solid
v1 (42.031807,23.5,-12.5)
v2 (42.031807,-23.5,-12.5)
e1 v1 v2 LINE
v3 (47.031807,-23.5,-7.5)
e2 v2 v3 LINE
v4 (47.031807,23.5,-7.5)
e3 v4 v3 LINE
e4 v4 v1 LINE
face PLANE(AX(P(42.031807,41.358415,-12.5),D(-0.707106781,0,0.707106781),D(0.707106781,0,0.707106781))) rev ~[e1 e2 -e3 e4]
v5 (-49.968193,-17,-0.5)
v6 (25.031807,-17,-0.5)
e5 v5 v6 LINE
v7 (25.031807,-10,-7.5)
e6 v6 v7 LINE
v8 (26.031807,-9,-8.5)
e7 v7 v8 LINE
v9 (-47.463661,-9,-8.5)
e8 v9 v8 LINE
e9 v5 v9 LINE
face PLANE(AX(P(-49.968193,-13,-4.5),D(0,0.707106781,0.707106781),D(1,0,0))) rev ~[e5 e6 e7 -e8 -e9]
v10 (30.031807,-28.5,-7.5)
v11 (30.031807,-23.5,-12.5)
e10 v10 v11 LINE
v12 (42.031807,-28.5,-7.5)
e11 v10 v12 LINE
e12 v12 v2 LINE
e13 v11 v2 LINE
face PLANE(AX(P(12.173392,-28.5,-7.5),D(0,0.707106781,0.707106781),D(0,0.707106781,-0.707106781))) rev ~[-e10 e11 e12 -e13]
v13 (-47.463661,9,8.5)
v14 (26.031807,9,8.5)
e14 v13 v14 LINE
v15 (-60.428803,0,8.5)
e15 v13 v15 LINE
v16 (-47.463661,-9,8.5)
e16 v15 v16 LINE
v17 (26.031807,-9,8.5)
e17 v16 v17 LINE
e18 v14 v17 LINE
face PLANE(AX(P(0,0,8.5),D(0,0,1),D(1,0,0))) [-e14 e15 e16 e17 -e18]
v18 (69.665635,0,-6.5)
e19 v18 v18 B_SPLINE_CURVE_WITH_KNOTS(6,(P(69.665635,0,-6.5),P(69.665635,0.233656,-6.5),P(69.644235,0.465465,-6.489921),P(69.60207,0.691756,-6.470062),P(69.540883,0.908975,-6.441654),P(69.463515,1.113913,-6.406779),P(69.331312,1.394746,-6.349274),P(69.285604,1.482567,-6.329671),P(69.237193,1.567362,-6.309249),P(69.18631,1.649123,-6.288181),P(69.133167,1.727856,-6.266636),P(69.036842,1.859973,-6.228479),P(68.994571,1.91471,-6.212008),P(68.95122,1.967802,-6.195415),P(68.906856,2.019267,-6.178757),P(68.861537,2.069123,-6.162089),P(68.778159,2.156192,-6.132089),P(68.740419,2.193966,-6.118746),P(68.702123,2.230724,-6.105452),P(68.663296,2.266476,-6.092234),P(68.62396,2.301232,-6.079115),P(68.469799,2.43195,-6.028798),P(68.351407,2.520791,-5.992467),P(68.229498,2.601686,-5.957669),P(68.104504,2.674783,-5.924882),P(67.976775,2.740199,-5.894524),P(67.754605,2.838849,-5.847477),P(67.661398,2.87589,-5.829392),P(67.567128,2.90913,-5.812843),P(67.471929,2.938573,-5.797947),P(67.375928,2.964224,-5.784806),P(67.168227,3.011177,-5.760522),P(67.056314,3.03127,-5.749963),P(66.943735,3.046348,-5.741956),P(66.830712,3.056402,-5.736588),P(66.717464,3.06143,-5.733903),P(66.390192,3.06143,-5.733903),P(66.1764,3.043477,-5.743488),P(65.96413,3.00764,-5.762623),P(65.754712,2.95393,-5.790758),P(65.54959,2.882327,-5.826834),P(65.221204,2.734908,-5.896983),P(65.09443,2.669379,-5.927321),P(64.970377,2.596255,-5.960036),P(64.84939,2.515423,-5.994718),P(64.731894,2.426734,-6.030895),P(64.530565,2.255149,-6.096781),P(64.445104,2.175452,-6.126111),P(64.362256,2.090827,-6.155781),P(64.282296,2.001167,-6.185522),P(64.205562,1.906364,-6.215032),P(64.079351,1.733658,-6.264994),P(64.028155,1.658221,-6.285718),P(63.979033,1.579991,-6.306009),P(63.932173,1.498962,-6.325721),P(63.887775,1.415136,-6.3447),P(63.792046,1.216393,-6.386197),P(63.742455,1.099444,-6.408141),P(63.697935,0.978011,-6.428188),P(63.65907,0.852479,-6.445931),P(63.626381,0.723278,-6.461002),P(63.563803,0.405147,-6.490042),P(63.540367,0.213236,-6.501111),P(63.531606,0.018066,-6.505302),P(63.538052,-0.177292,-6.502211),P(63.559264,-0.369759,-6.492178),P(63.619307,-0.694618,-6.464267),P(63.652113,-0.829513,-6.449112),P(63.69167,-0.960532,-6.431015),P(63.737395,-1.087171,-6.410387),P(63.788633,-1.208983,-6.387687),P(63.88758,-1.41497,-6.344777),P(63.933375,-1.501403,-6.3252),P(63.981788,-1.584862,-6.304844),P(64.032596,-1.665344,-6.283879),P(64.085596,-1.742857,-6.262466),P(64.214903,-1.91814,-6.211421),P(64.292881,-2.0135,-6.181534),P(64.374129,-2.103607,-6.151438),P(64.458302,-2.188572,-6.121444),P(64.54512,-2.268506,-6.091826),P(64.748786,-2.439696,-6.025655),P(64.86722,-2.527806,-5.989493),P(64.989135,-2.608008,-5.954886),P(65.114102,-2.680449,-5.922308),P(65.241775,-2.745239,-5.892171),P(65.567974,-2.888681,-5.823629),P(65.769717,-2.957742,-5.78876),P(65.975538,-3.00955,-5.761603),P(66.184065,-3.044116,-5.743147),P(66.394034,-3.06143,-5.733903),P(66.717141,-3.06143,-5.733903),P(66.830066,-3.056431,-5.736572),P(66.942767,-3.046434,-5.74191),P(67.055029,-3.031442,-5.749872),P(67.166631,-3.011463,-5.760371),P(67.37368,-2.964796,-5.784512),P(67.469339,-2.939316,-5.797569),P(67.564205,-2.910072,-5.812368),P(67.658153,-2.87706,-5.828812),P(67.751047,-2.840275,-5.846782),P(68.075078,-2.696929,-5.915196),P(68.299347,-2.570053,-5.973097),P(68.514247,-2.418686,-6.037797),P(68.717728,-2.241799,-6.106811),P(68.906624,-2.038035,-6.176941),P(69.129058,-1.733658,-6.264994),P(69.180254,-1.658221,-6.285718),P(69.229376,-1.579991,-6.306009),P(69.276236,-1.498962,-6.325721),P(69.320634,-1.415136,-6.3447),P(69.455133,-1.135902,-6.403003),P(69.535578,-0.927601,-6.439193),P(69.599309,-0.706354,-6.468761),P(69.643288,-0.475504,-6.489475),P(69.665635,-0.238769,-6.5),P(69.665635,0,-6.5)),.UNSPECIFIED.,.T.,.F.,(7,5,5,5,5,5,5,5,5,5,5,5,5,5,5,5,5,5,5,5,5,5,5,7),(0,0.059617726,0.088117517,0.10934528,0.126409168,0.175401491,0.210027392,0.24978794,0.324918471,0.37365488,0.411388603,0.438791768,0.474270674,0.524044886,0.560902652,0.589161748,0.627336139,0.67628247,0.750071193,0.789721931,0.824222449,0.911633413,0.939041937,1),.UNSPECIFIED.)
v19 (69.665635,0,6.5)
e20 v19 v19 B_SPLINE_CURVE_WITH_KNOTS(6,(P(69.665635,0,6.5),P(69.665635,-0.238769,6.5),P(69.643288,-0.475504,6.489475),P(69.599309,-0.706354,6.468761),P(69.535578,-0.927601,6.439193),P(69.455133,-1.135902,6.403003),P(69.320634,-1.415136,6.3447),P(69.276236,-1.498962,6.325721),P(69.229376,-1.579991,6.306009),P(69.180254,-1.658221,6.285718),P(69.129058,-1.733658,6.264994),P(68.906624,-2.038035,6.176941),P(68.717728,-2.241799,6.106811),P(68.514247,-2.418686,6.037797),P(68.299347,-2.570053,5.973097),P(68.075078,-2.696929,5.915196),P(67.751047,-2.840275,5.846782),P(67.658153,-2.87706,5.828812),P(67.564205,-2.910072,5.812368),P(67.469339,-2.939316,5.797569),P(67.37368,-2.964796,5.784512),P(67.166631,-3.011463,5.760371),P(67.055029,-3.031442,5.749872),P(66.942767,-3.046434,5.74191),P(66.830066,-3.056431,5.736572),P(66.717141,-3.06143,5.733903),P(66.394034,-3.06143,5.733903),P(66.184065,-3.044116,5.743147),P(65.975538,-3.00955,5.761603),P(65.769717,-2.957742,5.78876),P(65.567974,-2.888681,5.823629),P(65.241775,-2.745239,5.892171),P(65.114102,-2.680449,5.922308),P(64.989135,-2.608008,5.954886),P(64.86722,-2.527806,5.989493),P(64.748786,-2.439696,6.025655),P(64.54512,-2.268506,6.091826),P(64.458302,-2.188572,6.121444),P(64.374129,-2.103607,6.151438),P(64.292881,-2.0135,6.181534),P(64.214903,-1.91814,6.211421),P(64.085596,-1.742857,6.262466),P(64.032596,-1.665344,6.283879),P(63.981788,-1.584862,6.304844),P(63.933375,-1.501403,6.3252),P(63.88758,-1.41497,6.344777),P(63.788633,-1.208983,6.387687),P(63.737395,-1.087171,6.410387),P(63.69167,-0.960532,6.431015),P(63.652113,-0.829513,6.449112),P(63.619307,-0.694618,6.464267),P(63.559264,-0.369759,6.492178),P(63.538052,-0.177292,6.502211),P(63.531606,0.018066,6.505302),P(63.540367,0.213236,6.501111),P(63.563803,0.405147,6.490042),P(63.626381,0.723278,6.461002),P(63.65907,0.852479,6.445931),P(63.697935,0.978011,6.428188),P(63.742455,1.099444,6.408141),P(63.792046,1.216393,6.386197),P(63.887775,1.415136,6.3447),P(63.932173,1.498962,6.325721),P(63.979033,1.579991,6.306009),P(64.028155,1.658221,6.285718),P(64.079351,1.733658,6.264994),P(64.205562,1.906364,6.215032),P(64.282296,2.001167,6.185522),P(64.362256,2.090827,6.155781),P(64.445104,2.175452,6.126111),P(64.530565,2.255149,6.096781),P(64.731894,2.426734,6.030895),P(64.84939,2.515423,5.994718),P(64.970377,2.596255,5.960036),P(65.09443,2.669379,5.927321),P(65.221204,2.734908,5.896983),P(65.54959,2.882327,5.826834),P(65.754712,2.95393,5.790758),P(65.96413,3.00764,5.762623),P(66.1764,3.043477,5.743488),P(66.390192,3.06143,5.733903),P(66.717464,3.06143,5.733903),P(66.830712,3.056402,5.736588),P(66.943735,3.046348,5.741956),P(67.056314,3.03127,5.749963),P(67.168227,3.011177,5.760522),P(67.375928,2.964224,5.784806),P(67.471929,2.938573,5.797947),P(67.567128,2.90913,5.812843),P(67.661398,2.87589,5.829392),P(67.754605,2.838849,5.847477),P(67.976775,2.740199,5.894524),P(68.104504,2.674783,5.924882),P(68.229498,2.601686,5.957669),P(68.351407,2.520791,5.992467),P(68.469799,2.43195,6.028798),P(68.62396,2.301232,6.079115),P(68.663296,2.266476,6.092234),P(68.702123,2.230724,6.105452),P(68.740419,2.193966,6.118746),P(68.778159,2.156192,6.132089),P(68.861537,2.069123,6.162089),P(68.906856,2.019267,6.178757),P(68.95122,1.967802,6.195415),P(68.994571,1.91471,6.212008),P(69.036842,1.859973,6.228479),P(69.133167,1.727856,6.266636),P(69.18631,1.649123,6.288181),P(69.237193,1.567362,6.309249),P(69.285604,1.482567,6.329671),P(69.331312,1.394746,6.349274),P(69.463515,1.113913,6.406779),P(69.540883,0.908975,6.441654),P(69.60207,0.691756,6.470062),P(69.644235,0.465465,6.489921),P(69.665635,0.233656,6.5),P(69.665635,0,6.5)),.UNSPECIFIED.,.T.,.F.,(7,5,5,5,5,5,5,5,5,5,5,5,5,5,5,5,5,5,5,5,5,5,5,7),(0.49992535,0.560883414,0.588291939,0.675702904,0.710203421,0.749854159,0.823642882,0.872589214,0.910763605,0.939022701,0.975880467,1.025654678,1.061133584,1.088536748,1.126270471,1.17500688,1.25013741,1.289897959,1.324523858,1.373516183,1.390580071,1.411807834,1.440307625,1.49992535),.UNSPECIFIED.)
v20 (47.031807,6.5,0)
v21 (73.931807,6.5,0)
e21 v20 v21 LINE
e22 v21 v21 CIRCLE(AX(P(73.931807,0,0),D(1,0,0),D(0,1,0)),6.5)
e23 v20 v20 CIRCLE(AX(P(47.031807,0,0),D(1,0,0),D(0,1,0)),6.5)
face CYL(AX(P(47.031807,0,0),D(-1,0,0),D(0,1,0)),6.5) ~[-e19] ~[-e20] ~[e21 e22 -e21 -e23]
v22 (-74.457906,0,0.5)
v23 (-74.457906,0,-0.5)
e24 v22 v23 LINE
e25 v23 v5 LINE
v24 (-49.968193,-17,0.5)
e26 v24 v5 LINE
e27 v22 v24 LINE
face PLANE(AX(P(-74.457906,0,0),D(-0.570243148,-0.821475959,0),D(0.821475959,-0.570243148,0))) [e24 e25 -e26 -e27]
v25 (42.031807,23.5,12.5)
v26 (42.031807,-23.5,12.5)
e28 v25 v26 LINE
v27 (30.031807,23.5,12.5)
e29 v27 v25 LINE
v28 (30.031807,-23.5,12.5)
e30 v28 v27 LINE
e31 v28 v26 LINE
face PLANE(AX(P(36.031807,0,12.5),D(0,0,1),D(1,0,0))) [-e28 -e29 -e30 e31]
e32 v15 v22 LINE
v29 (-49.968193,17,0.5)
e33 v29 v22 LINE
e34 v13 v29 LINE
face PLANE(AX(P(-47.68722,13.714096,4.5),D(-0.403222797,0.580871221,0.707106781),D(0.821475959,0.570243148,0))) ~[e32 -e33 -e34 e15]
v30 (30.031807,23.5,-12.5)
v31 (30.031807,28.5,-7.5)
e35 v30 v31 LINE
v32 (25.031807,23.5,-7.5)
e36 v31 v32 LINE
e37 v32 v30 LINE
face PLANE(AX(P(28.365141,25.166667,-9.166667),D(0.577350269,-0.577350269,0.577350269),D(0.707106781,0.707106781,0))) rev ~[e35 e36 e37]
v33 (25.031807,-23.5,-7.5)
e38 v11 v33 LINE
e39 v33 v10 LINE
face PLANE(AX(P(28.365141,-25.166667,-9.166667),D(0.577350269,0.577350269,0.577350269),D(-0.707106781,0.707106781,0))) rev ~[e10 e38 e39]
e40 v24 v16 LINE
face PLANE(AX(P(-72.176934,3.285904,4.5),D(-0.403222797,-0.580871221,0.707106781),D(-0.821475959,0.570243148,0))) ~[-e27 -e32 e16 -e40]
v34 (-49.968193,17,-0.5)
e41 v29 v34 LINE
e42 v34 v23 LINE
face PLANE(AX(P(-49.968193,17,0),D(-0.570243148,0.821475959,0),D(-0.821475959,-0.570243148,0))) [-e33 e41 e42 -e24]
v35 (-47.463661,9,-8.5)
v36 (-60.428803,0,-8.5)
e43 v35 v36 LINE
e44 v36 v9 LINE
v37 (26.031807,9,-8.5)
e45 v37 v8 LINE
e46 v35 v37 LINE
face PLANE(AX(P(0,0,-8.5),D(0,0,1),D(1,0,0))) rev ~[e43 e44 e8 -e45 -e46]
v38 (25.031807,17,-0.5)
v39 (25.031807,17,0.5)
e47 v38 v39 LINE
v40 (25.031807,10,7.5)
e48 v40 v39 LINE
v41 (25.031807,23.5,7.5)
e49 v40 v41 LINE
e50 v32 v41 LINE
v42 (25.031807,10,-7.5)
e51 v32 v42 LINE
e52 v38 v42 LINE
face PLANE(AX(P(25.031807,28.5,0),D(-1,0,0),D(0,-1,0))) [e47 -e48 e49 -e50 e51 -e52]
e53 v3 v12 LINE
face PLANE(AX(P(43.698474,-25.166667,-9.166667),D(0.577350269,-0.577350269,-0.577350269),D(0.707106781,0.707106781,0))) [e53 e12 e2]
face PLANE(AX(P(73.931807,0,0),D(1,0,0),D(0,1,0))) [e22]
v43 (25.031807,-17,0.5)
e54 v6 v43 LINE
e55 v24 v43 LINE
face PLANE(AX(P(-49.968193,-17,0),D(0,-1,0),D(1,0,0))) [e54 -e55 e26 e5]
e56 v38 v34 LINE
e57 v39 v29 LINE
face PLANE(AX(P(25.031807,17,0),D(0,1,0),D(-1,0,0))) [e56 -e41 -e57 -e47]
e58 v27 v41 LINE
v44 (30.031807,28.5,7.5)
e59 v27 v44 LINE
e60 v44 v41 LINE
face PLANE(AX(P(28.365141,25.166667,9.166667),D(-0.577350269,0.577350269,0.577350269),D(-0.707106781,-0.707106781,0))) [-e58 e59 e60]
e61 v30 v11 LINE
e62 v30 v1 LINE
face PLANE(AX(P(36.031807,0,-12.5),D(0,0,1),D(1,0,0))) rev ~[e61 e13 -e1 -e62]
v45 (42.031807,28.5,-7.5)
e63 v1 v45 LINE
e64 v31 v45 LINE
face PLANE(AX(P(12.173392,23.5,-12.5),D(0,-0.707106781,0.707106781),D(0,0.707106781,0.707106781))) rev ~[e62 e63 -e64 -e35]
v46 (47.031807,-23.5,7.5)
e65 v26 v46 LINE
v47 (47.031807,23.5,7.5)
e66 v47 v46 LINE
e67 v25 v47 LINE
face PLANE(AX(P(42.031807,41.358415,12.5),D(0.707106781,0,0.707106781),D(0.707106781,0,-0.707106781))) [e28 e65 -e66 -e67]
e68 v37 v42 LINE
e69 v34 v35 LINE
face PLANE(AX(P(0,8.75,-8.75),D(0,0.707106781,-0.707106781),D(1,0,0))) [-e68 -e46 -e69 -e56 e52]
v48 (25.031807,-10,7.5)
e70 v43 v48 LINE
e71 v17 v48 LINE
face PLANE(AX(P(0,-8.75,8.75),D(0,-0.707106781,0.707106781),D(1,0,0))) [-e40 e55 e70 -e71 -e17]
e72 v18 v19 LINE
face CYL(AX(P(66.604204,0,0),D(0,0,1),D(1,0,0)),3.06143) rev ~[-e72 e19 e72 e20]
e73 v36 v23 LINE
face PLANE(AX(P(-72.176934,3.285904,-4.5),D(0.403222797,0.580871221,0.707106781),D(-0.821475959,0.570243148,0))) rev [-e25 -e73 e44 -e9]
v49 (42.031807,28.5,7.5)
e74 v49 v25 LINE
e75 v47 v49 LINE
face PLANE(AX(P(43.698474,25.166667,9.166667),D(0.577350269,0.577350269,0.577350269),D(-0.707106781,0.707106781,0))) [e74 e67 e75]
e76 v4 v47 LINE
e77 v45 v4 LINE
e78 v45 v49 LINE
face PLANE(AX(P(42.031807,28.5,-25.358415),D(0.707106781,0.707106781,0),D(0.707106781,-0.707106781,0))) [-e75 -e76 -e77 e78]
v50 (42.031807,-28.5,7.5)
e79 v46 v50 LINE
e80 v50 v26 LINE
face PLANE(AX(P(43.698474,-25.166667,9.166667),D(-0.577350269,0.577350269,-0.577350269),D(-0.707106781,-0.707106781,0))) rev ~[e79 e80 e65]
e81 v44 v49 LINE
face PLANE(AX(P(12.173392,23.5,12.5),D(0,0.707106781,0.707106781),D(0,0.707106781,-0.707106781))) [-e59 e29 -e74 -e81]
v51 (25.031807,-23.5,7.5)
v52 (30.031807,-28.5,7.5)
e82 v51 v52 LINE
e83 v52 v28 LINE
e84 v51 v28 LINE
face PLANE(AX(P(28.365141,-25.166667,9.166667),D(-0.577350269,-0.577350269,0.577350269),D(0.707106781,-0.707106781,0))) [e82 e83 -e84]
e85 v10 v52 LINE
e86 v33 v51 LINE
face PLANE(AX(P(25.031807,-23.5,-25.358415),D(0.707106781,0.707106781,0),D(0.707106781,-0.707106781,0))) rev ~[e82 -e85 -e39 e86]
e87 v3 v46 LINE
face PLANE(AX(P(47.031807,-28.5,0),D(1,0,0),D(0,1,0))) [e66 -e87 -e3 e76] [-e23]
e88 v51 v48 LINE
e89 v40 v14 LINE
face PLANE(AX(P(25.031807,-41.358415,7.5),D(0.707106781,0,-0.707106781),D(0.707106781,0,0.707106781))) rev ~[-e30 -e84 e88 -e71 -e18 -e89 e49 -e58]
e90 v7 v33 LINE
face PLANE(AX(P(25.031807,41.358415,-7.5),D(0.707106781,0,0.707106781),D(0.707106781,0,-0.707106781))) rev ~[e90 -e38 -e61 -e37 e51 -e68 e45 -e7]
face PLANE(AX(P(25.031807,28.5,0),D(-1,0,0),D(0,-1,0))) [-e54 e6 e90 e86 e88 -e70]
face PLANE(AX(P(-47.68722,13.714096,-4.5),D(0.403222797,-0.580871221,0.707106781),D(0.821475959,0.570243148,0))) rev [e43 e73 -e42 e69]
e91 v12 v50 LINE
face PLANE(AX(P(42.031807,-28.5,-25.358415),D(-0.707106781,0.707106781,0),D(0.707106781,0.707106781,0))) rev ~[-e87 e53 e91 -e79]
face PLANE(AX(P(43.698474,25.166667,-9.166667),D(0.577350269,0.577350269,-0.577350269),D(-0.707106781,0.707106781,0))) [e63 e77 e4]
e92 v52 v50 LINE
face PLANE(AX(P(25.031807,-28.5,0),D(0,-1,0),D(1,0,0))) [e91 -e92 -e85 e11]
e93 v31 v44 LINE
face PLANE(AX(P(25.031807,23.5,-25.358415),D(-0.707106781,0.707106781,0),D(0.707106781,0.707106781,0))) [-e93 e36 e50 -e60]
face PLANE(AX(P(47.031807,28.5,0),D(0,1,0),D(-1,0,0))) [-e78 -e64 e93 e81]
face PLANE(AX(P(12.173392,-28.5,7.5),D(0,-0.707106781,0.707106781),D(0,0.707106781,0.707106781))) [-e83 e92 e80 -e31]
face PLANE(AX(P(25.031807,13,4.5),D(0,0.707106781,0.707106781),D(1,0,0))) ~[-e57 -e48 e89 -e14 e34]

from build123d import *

# Parameters (mm, degrees)
F1_DEPTH     = 12.5
F2_DEPTH     = 8.5
F3_SIZE      = 8
F4_T1_DEPTH  = 6.3508529611
F4_T3_DEPTH  = 6.3508529611
F4_T5_DEPTH  = 6.3508529611
F4_T7_DEPTH  = 6.3508529611
F4_T9_DEPTH  = 6.3508529611
F4_T11_DEPTH = 6.3508529611
F4_T13_DEPTH = 6.3508529611
F4_T15_DEPTH = 6.3508529611
F4_T17_DEPTH = 50.7168298797
F4_T19_DEPTH = 47.7168298797
F4_T21_DEPTH = 82.7168298797
F4_T26_DEPTH = 82.7168298797
F4_T31_DEPTH = 82.7168298797
F4_T36_DEPTH = 82.7168298797
F4_T41_DEPTH = 82.7168298797
F4_T46_DEPTH = 82.7168298797
F4_T51_DEPTH = 82.7168298797
F5_R         = 6.5
F6_DEPTH     = 26.9
F7_R         = 3.0614301368
F8_DEPTH     = 6.5


# Not quite as in the source:
# - a fillet or chamfer that OpenCascade refuses, or shapes differently, is made with other operations: its cross-section is extruded or revolved along the edge and cut away or added


with BuildPart() as f1:
    # F0 (on Top) → F1 (new body, symmetric)
    with BuildSketch(Plane.XY):
        Polygon((25.0318072736, -28.5), (47.0318072736, -28.5), (47.0318072736, 0), (47.0318072736, 28.5), (25.0318072736, 28.5), (25.0318072736, 17), (25.0318072736, -17), align=None)
    extrude(amount=F1_DEPTH, both=True)

    # F0 (on Top) → F2 (join, symmetric)
    with BuildSketch(Plane.XY):
        Polygon((-49.9681927264, -17), (25.0318072736, -17), (25.0318072736, 17), (-49.9681927264, 17), (-74.4579061866, 0), align=None)
    extrude(amount=F2_DEPTH, both=True)

    # F3
    f3_edges = [f1.edges().sort_by_distance(p)[0] for p in [
        (-12.468193, 17, -8.5),
        (-12.468193, -17, -8.5),
        (-62.213049, -8.5, -8.5),
        (-12.468193, -17, 8.5),
        (-12.468193, 17, 8.5),
        (-62.213049, -8.5, 8.5),
        (-62.213049, 8.5, 8.5),
        (-62.213049, 8.5, -8.5),
    ]]
    chamfer(f3_edges, length=F3_SIZE)

    # F4: chamfer of 5 on 12 edges, made by hand

    # F4_s2 → F4_t1 (cut)
    with BuildSketch(Plane(origin=(-1.9893975755, 1.9893975755, -1.9893975755), x_dir=(-0.7071067812, -0.7071067812, 0), z_dir=(-0.5773502692, 0.5773502692, -0.5773502692))):
        Polygon((-34.3171700264, -6.7490820577), (-37.8527039324, -12.8728064147), (-41.3882378383, -6.7490820577), align=None)
    extrude(amount=F4_T1_DEPTH, mode=Mode.SUBTRACT)

    # F4_s4 → F4_t3 (cut)
    with BuildSketch(Plane(origin=(-1.9893975755, -1.9893975755, -1.9893975755), x_dir=(0.7071067812, -0.7071067812, 0), z_dir=(-0.5773502692, -0.5773502692, -0.5773502692))):
        Polygon((34.3171700264, -6.7490820577), (41.3882378383, -6.7490820577), (37.8527039324, -12.8728064147), align=None)
    extrude(amount=F4_T3_DEPTH, mode=Mode.SUBTRACT)

    # F4_s6 → F4_t5 (cut)
    with BuildSketch(Plane(origin=(-1.9893975755, -1.9893975755, 1.9893975755), x_dir=(0.7071067812, -0.7071067812, 0), z_dir=(-0.5773502692, -0.5773502692, 0.5773502692))):
        Polygon((34.3171700264, 6.7490820577), (41.3882378383, 6.7490820577), (37.8527039324, 12.8728064147), align=None)
    extrude(amount=F4_T5_DEPTH, mode=Mode.SUBTRACT)

    # F4_s8 → F4_t7 (cut)
    with BuildSketch(Plane(origin=(-1.9893975755, 1.9893975755, 1.9893975755), x_dir=(-0.7071067812, -0.7071067812, 0), z_dir=(-0.5773502692, 0.5773502692, 0.5773502692))):
        Polygon((-34.3171700264, 6.7490820577), (-37.8527039324, 12.8728064147), (-41.3882378383, 6.7490820577), align=None)
    extrude(amount=F4_T7_DEPTH, mode=Mode.SUBTRACT)

    # F4_s10 → F4_t9 (cut)
    with BuildSketch(Plane(origin=(26.0106024245, 26.0106024245, -26.0106024245), x_dir=(-0.7071067812, 0.7071067812, 0), z_dir=(0.5773502692, 0.5773502692, -0.5773502692))):
        Polygon((-16.6395004968, 22.6707653858), (-13.1039665908, 16.5470410289), (-9.5684326849, 22.6707653858), align=None)
    extrude(amount=F4_T9_DEPTH, mode=Mode.SUBTRACT)

    # F4_s12 → F4_t11 (cut)
    with BuildSketch(Plane(origin=(26.0106024245, 26.0106024245, 26.0106024245), x_dir=(-0.7071067812, 0.7071067812, 0), z_dir=(0.5773502692, 0.5773502692, 0.5773502692))):
        Polygon((-13.1039665908, -16.5470410289), (-16.6395004968, -22.6707653858), (-9.5684326849, -22.6707653858), align=None)
    extrude(amount=F4_T11_DEPTH, mode=Mode.SUBTRACT)

    # F4_s14 → F4_t13 (cut)
    with BuildSketch(Plane(origin=(26.0106024245, -26.0106024245, -26.0106024245), x_dir=(0.7071067812, 0.7071067812, 0), z_dir=(0.5773502692, -0.5773502692, -0.5773502692))):
        Polygon((16.6395004968, 22.6707653858), (9.5684326849, 22.6707653858), (13.1039665908, 16.5470410289), align=None)
    extrude(amount=F4_T13_DEPTH, mode=Mode.SUBTRACT)

    # F4_s16 → F4_t15 (cut)
    with BuildSketch(Plane(origin=(26.0106024245, -26.0106024245, 26.0106024245), x_dir=(0.7071067812, 0.7071067812, 0), z_dir=(0.5773502692, -0.5773502692, 0.5773502692))):
        Polygon((9.5684326849, -22.6707653858), (13.1039665908, -16.5470410289), (16.6395004968, -22.6707653858), align=None)
    extrude(amount=F4_T15_DEPTH, mode=Mode.SUBTRACT)

    # F4_s18 → F4_t17 (cut)
    with BuildSketch(Plane.XY.offset(-25.3584149398)):
        Polygon((25.0318072736, -23.5), (30.0318072736, -28.5), (25.0318072736, -28.5), align=None)
        Polygon((25.0318072736, 23.5), (30.0318072736, 28.5), (25.0318072736, 28.5), align=None)
        Polygon((42.0318072736, 28.5), (47.0318072736, 23.5), (47.0318072736, 28.5), align=None)
        Polygon((42.0318072736, -28.5), (47.0318072736, -23.5), (47.0318072736, -28.5), align=None)
    extrude(amount=F4_T17_DEPTH, mode=Mode.SUBTRACT)

    # F4_s20 → F4_t19 (cut)
    with BuildSketch(Plane.YZ.offset(12.1733923338)):
        Polygon((23.5, -12.5), (28.5, -7.5), (28.5, -12.5), align=None)
        Polygon((23.5, 12.5), (28.5, 7.5), (28.5, 12.5), align=None)
        Polygon((-28.5, -7.5), (-23.5, -12.5), (-28.5, -12.5), align=None)
        Polygon((-28.5, 7.5), (-23.5, 12.5), (-28.5, 12.5), align=None)
    extrude(amount=F4_T19_DEPTH, mode=Mode.SUBTRACT)

    # F4_s22 → F4_t21 (cut)
    with BuildSketch(Plane.XZ.offset(-41.3584149398)):
        Polygon((42.0318072736, 12.5), (47.0318072736, 7.5), (47.0318072736, 12.5), align=None)
        Polygon((42.0318072736, -12.5), (47.0318072736, -7.5), (47.0318072736, -12.5), align=None)
    extrude(amount=F4_T21_DEPTH, mode=Mode.SUBTRACT)


with BuildPart() as f4_tool24:
    # F4_s25 → F4_t26 (new body)
    with BuildSketch(Plane.XZ.offset(-41.3584149398)):
        Polygon((25.0318072736, -7.5), (30.0318072736, -12.5), (25.0318072736, -12.5), align=None)
    extrude(amount=F4_T26_DEPTH)

    split(bisect_by=Plane(origin=(0, 8.75, -8.75), x_dir=(1, 0, 0), z_dir=(0, 0.7071067812, -0.7071067812)), keep=Keep.TOP)


with BuildPart() as f1_1:
    add(f1.part)

    # F4_t23: cut F4_tool24
    add(f4_tool24.part, mode=Mode.SUBTRACT)


with BuildPart() as f4_tool29:
    # F4_s30 → F4_t31 (new body)
    with BuildSketch(Plane.XZ.offset(-41.3584149398)):
        Polygon((25.0318072736, -7.5), (30.0318072736, -12.5), (25.0318072736, -12.5), align=None)
    extrude(amount=F4_T31_DEPTH)

    split(bisect_by=Plane.XY.offset(-8.5), keep=Keep.BOTTOM)


with BuildPart() as f1_2:
    add(f1_1.part)

    # F4_t28: cut F4_tool29
    add(f4_tool29.part, mode=Mode.SUBTRACT)


with BuildPart() as f4_tool34:
    # F4_s35 → F4_t36 (new body)
    with BuildSketch(Plane.XZ.offset(-41.3584149398)):
        Polygon((25.0318072736, -7.5), (30.0318072736, -12.5), (25.0318072736, -12.5), align=None)
    extrude(amount=F4_T36_DEPTH)

    split(bisect_by=Plane(origin=(0, -8.75, -8.75), x_dir=(1, 0, 0), z_dir=(0, -0.7071067812, -0.7071067812)), keep=Keep.TOP)


with BuildPart() as f1_3:
    add(f1_2.part)

    # F4_t33: cut F4_tool34
    add(f4_tool34.part, mode=Mode.SUBTRACT)


with BuildPart() as f4_tool39:
    # F4_s40 → F4_t41 (new body)
    with BuildSketch(Plane.XZ.offset(41.3584149398)):
        Polygon((25.0318072736, 7.5), (30.0318072736, 12.5), (25.0318072736, 12.5), align=None)
    extrude(amount=-F4_T41_DEPTH)

    split(bisect_by=Plane(origin=(0, -8.75, 8.75), x_dir=(1, 0, 0), z_dir=(0, -0.7071067812, 0.7071067812)), keep=Keep.TOP)


with BuildPart() as f1_4:
    add(f1_3.part)

    # F4_t38: cut F4_tool39
    add(f4_tool39.part, mode=Mode.SUBTRACT)


with BuildPart() as f4_tool44:
    # F4_s45 → F4_t46 (new body)
    with BuildSketch(Plane.XZ.offset(41.3584149398)):
        Polygon((25.0318072736, 7.5), (30.0318072736, 12.5), (25.0318072736, 12.5), align=None)
    extrude(amount=-F4_T46_DEPTH)

    split(bisect_by=Plane.XY.offset(8.5), keep=Keep.TOP)


with BuildPart() as f1_5:
    add(f1_4.part)

    # F4_t43: cut F4_tool44
    add(f4_tool44.part, mode=Mode.SUBTRACT)


with BuildPart() as f4_tool49:
    # F4_s50 → F4_t51 (new body)
    with BuildSketch(Plane.XZ.offset(41.3584149398)):
        Polygon((25.0318072736, 7.5), (30.0318072736, 12.5), (25.0318072736, 12.5), align=None)
    extrude(amount=-F4_T51_DEPTH)

    split(bisect_by=Plane(origin=(0, 8.75, 8.75), x_dir=(1, 0, 0), z_dir=(0, 0.7071067812, 0.7071067812)), keep=Keep.TOP)


with BuildPart() as f1_6:
    add(f1_5.part)

    # F4_t48: cut F4_tool49
    add(f4_tool49.part, mode=Mode.SUBTRACT)

    # F5 (on face) → F6 (join)
    with BuildSketch(Plane.YZ.offset(47.0318072736)):
        Circle(F5_R)
    extrude(amount=F6_DEPTH)

    # F7 (on Top) → F8 (cut, symmetric)
    with BuildSketch(Plane.XY):
        with Locations((66.6042044759, 0)):
            Circle(F7_R)
    extrude(amount=F8_DEPTH, both=True, mode=Mode.SUBTRACT)


solid = f1_6.part
